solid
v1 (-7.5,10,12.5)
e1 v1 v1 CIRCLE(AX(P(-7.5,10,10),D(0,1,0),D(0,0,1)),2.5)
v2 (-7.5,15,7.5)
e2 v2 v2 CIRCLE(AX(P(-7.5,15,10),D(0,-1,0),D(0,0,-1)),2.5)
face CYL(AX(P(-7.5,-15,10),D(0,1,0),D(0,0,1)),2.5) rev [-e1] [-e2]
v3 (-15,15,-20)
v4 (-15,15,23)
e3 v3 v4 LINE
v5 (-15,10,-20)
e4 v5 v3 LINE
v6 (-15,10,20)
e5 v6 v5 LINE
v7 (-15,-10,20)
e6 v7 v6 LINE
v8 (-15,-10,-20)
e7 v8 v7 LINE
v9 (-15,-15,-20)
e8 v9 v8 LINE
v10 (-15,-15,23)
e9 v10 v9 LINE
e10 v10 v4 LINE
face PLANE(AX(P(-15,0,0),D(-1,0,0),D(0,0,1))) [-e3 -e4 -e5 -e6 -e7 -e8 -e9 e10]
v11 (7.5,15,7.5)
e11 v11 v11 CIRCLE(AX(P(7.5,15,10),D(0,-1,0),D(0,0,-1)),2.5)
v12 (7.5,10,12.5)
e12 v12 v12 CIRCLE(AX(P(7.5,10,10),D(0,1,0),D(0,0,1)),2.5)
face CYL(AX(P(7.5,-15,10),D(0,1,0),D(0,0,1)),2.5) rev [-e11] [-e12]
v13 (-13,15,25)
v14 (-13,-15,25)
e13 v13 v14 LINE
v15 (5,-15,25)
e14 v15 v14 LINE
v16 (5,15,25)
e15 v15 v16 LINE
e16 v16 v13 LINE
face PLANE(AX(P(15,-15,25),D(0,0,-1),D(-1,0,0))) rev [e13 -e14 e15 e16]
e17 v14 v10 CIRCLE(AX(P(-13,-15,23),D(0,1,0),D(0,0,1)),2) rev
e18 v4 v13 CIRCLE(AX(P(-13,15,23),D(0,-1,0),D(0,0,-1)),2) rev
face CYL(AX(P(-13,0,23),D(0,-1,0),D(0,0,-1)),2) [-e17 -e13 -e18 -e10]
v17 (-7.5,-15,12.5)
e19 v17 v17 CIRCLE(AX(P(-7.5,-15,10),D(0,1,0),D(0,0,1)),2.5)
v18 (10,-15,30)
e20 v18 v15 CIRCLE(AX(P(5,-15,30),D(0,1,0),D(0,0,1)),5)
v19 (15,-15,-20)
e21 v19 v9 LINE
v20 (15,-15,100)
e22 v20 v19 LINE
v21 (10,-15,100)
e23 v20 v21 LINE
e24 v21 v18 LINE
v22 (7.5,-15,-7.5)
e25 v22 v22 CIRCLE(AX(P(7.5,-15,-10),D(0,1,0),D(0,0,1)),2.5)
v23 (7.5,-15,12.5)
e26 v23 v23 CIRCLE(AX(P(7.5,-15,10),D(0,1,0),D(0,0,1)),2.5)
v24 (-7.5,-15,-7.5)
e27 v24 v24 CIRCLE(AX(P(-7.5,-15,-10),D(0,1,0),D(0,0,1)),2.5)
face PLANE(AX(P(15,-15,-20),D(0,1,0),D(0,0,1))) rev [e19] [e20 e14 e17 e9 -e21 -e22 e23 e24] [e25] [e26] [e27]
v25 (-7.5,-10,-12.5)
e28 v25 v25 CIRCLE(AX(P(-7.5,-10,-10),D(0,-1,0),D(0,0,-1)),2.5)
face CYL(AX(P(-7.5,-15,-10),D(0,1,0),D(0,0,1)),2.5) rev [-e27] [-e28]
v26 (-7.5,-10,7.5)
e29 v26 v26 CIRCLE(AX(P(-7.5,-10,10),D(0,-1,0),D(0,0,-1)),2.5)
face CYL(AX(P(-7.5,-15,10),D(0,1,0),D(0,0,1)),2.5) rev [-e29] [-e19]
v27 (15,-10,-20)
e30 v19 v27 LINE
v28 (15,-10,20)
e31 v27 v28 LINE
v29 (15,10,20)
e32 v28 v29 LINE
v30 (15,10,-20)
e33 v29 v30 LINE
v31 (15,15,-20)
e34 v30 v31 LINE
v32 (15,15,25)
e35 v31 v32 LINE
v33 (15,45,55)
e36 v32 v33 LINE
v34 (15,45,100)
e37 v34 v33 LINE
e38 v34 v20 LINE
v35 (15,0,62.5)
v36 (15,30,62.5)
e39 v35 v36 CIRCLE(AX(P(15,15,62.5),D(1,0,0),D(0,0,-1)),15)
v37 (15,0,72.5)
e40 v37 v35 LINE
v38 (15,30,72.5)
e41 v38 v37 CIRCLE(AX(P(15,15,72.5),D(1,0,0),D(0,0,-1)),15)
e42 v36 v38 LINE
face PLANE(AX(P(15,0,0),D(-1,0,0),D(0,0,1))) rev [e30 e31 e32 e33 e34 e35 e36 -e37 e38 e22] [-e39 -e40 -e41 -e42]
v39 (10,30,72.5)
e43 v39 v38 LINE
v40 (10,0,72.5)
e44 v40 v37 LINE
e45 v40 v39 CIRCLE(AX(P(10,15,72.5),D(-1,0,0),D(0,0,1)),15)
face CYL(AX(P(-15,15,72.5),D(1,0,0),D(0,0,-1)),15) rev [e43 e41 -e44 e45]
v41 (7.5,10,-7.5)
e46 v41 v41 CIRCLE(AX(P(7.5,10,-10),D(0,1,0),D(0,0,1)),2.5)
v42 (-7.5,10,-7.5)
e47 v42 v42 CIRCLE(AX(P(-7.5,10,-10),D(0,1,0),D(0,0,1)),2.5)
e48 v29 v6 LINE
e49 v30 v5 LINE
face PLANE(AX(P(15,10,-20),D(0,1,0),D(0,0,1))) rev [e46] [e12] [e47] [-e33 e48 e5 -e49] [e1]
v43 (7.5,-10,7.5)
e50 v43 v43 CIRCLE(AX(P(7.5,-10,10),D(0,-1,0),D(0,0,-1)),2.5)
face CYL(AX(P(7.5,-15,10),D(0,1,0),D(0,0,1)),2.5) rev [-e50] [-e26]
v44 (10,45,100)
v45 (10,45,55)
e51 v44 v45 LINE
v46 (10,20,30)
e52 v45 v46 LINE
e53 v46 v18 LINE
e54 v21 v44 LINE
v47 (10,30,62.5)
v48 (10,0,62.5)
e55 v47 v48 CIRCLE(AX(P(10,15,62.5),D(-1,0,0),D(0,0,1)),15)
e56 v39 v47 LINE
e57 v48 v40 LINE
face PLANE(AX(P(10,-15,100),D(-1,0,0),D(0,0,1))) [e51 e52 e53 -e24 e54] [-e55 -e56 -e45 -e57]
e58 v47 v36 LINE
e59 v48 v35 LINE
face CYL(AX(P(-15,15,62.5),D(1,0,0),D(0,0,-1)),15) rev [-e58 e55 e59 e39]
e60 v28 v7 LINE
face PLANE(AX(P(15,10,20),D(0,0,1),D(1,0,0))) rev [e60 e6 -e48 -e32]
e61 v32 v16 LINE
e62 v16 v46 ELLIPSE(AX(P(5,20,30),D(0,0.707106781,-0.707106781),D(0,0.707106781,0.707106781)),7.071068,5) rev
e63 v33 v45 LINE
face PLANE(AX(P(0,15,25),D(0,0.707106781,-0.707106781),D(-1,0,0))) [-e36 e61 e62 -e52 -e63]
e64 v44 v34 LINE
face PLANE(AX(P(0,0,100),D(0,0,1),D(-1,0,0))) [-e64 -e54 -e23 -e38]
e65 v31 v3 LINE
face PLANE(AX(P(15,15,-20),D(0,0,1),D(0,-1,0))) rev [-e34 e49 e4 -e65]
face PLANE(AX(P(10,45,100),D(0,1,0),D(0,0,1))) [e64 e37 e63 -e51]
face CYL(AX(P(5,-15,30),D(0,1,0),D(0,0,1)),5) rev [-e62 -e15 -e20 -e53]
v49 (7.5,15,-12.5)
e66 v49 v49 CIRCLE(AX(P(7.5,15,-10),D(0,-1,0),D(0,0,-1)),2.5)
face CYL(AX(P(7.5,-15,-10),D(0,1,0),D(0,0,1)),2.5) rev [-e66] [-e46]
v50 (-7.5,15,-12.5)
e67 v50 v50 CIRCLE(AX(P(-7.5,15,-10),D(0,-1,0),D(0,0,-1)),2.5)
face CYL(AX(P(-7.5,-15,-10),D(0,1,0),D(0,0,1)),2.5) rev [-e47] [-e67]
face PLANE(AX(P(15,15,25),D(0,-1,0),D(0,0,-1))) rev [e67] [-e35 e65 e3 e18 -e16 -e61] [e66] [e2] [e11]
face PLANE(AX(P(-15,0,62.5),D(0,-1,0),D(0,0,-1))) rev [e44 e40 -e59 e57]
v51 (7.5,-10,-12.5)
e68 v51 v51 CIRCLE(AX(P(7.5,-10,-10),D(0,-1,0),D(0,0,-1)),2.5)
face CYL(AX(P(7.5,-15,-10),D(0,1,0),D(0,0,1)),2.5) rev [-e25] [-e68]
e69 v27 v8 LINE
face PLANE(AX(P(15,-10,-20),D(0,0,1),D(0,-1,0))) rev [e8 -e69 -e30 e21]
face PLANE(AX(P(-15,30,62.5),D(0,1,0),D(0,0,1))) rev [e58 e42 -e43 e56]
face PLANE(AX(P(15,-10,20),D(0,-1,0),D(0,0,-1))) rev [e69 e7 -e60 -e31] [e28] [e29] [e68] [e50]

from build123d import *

# Parameters (mm, degrees)
BOSS_EXTRUDE1_DEPTH      = 15
SKETCH2_W                = 5
SKETCH2_H                = 60
BOSS_EXTRUDE2_DEPTH      = 75
CHAMFER1_SIZE            = 30
CHAMFER1_OF_MIRROR1_SIZE = 30
CUT_EXTRUDE3_DEPTH       = 113.472218792
CUT_EXTRUDE4_DEPTH       = 114.688170009
FILLET3_R                = 5
FILLET4_R                = 2
CUT_EXTRUDE6_DEPTH       = 106.475115549
CUT_EXTRUDE6_DEPTH_BACK  = 106.475115549
SKETCH8_R                = 2.5


# Some blends are built 0.0001 mm under size
with BuildPart() as part:
    # Sketch1 → Boss-Extrude1 (new, symmetric)
    with BuildSketch(Plane(origin=(0, 0, 0), x_dir=(0, 0, -1), z_dir=(1, 0, 0))):
        Polygon((20, 10), (-20, 10), (-20, -10), (20, -10), (20, -15), (-25, -15), (-25, 15), (20, 15), align=None)
    extrude(amount=BOSS_EXTRUDE1_DEPTH, both=True)

    # Sketch2 → Boss-Extrude2 (add)
    with BuildSketch(Plane.XY.offset(25)):
        with Locations((-12.5, 15)):
            Rectangle(SKETCH2_W, SKETCH2_H)
    boss_extrude2 = extrude(amount=BOSS_EXTRUDE2_DEPTH)

    # Chamfer1
    chamfer1_edges = [part.edges().sort_by_distance(p)[0] for p in [
        (-12.5, 45, 25),
    ]]
    chamfer(chamfer1_edges, length=CHAMFER1_SIZE - 0.0001)  # a hair under: the kernel refuses the full size

    # Mirror1: Boss-Extrude2 across plane
    add(boss_extrude2.mirror(Plane(origin=(0, 0, 0), x_dir=(0, 0, 1), z_dir=(1, 0, 0))))

    # Chamfer1 of Mirror1
    chamfer1_of_mirror1_edges = [part.edges().sort_by_distance(p)[0] for p in [
        (12.5, 45, 25),
    ]]
    chamfer(chamfer1_of_mirror1_edges, length=CHAMFER1_OF_MIRROR1_SIZE - 0.0001)  # a hair under: the kernel refuses the full size

    # Sketch5 → Cut-Extrude3 (cut, through all)
    with BuildSketch(Plane(origin=(-10, 0, 0), x_dir=(0, 0, -1), z_dir=(1, 0, 0))):
        Polygon((-25, -15), (-25, 15), (-55, 45), (-100, 45), (-100, -15), align=None)
    extrude(amount=-CUT_EXTRUDE3_DEPTH, mode=Mode.SUBTRACT)

    # Sketch6 → Cut-Extrude4 (cut, through all)
    with BuildSketch(Plane(origin=(15, 0, 0), x_dir=(0, 0, -1), z_dir=(1, 0, 0))):
        with BuildLine():
            Line((-62.5, 0), (-72.5, 0))
            ThreePointArc((-72.5, 0), (-87.5, 15), (-72.5, 30))
            Line((-72.5, 30), (-62.5, 30))
            ThreePointArc((-62.5, 30), (-47.5, 15), (-62.5, 0))
        make_face()
    extrude(amount=-CUT_EXTRUDE4_DEPTH, mode=Mode.SUBTRACT)

    # Fillet3
    # the kernel refuses this fillet: 5 mm, written as the material it adds along each edge
    with BuildSketch(Plane(origin=(10, 27.5, 25), x_dir=(0, 0, 1), z_dir=(0, -1, 0))) as fillet3_piece_1_section:
        with BuildLine():
            CenterArc((FILLET3_R, FILLET3_R), FILLET3_R, 180, 90)
            Line((0, FILLET3_R), (0, 0))
            Line((0, 0), (FILLET3_R, 0))
        make_face()
    fillet3_piece_1 = extrude(amount=42.5, mode=Mode.PRIVATE)
    fillet3_piece_1 = split(fillet3_piece_1, bisect_by=Plane(origin=(9.467598147, 16.61296207, 26.61286207), z_dir=(0, -0.7071067811865476, 0.7071067811865476)), keep=Keep.TOP, mode=Mode.PRIVATE)
    fillet3_piece_1 = split(fillet3_piece_1, bisect_by=Plane(origin=(9.467598147, 15, 27.150516093), z_dir=(0, 1, 0)), keep=Keep.TOP, mode=Mode.PRIVATE)
    add(fillet3_piece_1)
    with BuildSketch(Plane(origin=(10, 15, 25), x_dir=(0, 0, 1), z_dir=(0, -1, 0))) as fillet3_piece_2_section:
        with BuildLine():
            CenterArc((FILLET3_R, FILLET3_R), FILLET3_R, 180, 90)
            Line((0, FILLET3_R), (0, 0))
            Line((0, 0), (FILLET3_R, 0))
        make_face()
    fillet3_piece_2 = extrude(amount=30, mode=Mode.PRIVATE)
    fillet3_piece_2 = split(fillet3_piece_2, bisect_by=Plane(origin=(8.982634351, 0, 25), z_dir=(0, 0, 1)), keep=Keep.TOP, mode=Mode.PRIVATE)
    add(fillet3_piece_2)

    # Fillet4
    fillet4_edges = [part.edges().sort_by_distance(p)[0] for p in [
        (-15, 0, 25),
    ]]
    fillet(fillet4_edges, radius=FILLET4_R)

    # Sketch8 → Cut-Extrude6 (cut, two sides: drawn at the far end of the back side and taken through both)
    with BuildSketch(Plane(origin=(0, 15, 0), x_dir=(1, 0, 0), z_dir=(0, 1, 0)).offset(-CUT_EXTRUDE6_DEPTH_BACK)):
        with Locations(Location((-7.5, -10, 0), (0, 0, 270))):
            Circle(SKETCH8_R)
        with Locations(Location((7.5, -10, 0), (0, 0, 270))):
            Circle(SKETCH8_R)
        with Locations(Location((-7.5, 10, 0), (0, 0, 270))):
            Circle(SKETCH8_R)
        with Locations(Location((7.5, 10, 0), (0, 0, 270))):
            Circle(SKETCH8_R)
    extrude(amount=CUT_EXTRUDE6_DEPTH + CUT_EXTRUDE6_DEPTH_BACK, mode=Mode.SUBTRACT)


solid = part.part
